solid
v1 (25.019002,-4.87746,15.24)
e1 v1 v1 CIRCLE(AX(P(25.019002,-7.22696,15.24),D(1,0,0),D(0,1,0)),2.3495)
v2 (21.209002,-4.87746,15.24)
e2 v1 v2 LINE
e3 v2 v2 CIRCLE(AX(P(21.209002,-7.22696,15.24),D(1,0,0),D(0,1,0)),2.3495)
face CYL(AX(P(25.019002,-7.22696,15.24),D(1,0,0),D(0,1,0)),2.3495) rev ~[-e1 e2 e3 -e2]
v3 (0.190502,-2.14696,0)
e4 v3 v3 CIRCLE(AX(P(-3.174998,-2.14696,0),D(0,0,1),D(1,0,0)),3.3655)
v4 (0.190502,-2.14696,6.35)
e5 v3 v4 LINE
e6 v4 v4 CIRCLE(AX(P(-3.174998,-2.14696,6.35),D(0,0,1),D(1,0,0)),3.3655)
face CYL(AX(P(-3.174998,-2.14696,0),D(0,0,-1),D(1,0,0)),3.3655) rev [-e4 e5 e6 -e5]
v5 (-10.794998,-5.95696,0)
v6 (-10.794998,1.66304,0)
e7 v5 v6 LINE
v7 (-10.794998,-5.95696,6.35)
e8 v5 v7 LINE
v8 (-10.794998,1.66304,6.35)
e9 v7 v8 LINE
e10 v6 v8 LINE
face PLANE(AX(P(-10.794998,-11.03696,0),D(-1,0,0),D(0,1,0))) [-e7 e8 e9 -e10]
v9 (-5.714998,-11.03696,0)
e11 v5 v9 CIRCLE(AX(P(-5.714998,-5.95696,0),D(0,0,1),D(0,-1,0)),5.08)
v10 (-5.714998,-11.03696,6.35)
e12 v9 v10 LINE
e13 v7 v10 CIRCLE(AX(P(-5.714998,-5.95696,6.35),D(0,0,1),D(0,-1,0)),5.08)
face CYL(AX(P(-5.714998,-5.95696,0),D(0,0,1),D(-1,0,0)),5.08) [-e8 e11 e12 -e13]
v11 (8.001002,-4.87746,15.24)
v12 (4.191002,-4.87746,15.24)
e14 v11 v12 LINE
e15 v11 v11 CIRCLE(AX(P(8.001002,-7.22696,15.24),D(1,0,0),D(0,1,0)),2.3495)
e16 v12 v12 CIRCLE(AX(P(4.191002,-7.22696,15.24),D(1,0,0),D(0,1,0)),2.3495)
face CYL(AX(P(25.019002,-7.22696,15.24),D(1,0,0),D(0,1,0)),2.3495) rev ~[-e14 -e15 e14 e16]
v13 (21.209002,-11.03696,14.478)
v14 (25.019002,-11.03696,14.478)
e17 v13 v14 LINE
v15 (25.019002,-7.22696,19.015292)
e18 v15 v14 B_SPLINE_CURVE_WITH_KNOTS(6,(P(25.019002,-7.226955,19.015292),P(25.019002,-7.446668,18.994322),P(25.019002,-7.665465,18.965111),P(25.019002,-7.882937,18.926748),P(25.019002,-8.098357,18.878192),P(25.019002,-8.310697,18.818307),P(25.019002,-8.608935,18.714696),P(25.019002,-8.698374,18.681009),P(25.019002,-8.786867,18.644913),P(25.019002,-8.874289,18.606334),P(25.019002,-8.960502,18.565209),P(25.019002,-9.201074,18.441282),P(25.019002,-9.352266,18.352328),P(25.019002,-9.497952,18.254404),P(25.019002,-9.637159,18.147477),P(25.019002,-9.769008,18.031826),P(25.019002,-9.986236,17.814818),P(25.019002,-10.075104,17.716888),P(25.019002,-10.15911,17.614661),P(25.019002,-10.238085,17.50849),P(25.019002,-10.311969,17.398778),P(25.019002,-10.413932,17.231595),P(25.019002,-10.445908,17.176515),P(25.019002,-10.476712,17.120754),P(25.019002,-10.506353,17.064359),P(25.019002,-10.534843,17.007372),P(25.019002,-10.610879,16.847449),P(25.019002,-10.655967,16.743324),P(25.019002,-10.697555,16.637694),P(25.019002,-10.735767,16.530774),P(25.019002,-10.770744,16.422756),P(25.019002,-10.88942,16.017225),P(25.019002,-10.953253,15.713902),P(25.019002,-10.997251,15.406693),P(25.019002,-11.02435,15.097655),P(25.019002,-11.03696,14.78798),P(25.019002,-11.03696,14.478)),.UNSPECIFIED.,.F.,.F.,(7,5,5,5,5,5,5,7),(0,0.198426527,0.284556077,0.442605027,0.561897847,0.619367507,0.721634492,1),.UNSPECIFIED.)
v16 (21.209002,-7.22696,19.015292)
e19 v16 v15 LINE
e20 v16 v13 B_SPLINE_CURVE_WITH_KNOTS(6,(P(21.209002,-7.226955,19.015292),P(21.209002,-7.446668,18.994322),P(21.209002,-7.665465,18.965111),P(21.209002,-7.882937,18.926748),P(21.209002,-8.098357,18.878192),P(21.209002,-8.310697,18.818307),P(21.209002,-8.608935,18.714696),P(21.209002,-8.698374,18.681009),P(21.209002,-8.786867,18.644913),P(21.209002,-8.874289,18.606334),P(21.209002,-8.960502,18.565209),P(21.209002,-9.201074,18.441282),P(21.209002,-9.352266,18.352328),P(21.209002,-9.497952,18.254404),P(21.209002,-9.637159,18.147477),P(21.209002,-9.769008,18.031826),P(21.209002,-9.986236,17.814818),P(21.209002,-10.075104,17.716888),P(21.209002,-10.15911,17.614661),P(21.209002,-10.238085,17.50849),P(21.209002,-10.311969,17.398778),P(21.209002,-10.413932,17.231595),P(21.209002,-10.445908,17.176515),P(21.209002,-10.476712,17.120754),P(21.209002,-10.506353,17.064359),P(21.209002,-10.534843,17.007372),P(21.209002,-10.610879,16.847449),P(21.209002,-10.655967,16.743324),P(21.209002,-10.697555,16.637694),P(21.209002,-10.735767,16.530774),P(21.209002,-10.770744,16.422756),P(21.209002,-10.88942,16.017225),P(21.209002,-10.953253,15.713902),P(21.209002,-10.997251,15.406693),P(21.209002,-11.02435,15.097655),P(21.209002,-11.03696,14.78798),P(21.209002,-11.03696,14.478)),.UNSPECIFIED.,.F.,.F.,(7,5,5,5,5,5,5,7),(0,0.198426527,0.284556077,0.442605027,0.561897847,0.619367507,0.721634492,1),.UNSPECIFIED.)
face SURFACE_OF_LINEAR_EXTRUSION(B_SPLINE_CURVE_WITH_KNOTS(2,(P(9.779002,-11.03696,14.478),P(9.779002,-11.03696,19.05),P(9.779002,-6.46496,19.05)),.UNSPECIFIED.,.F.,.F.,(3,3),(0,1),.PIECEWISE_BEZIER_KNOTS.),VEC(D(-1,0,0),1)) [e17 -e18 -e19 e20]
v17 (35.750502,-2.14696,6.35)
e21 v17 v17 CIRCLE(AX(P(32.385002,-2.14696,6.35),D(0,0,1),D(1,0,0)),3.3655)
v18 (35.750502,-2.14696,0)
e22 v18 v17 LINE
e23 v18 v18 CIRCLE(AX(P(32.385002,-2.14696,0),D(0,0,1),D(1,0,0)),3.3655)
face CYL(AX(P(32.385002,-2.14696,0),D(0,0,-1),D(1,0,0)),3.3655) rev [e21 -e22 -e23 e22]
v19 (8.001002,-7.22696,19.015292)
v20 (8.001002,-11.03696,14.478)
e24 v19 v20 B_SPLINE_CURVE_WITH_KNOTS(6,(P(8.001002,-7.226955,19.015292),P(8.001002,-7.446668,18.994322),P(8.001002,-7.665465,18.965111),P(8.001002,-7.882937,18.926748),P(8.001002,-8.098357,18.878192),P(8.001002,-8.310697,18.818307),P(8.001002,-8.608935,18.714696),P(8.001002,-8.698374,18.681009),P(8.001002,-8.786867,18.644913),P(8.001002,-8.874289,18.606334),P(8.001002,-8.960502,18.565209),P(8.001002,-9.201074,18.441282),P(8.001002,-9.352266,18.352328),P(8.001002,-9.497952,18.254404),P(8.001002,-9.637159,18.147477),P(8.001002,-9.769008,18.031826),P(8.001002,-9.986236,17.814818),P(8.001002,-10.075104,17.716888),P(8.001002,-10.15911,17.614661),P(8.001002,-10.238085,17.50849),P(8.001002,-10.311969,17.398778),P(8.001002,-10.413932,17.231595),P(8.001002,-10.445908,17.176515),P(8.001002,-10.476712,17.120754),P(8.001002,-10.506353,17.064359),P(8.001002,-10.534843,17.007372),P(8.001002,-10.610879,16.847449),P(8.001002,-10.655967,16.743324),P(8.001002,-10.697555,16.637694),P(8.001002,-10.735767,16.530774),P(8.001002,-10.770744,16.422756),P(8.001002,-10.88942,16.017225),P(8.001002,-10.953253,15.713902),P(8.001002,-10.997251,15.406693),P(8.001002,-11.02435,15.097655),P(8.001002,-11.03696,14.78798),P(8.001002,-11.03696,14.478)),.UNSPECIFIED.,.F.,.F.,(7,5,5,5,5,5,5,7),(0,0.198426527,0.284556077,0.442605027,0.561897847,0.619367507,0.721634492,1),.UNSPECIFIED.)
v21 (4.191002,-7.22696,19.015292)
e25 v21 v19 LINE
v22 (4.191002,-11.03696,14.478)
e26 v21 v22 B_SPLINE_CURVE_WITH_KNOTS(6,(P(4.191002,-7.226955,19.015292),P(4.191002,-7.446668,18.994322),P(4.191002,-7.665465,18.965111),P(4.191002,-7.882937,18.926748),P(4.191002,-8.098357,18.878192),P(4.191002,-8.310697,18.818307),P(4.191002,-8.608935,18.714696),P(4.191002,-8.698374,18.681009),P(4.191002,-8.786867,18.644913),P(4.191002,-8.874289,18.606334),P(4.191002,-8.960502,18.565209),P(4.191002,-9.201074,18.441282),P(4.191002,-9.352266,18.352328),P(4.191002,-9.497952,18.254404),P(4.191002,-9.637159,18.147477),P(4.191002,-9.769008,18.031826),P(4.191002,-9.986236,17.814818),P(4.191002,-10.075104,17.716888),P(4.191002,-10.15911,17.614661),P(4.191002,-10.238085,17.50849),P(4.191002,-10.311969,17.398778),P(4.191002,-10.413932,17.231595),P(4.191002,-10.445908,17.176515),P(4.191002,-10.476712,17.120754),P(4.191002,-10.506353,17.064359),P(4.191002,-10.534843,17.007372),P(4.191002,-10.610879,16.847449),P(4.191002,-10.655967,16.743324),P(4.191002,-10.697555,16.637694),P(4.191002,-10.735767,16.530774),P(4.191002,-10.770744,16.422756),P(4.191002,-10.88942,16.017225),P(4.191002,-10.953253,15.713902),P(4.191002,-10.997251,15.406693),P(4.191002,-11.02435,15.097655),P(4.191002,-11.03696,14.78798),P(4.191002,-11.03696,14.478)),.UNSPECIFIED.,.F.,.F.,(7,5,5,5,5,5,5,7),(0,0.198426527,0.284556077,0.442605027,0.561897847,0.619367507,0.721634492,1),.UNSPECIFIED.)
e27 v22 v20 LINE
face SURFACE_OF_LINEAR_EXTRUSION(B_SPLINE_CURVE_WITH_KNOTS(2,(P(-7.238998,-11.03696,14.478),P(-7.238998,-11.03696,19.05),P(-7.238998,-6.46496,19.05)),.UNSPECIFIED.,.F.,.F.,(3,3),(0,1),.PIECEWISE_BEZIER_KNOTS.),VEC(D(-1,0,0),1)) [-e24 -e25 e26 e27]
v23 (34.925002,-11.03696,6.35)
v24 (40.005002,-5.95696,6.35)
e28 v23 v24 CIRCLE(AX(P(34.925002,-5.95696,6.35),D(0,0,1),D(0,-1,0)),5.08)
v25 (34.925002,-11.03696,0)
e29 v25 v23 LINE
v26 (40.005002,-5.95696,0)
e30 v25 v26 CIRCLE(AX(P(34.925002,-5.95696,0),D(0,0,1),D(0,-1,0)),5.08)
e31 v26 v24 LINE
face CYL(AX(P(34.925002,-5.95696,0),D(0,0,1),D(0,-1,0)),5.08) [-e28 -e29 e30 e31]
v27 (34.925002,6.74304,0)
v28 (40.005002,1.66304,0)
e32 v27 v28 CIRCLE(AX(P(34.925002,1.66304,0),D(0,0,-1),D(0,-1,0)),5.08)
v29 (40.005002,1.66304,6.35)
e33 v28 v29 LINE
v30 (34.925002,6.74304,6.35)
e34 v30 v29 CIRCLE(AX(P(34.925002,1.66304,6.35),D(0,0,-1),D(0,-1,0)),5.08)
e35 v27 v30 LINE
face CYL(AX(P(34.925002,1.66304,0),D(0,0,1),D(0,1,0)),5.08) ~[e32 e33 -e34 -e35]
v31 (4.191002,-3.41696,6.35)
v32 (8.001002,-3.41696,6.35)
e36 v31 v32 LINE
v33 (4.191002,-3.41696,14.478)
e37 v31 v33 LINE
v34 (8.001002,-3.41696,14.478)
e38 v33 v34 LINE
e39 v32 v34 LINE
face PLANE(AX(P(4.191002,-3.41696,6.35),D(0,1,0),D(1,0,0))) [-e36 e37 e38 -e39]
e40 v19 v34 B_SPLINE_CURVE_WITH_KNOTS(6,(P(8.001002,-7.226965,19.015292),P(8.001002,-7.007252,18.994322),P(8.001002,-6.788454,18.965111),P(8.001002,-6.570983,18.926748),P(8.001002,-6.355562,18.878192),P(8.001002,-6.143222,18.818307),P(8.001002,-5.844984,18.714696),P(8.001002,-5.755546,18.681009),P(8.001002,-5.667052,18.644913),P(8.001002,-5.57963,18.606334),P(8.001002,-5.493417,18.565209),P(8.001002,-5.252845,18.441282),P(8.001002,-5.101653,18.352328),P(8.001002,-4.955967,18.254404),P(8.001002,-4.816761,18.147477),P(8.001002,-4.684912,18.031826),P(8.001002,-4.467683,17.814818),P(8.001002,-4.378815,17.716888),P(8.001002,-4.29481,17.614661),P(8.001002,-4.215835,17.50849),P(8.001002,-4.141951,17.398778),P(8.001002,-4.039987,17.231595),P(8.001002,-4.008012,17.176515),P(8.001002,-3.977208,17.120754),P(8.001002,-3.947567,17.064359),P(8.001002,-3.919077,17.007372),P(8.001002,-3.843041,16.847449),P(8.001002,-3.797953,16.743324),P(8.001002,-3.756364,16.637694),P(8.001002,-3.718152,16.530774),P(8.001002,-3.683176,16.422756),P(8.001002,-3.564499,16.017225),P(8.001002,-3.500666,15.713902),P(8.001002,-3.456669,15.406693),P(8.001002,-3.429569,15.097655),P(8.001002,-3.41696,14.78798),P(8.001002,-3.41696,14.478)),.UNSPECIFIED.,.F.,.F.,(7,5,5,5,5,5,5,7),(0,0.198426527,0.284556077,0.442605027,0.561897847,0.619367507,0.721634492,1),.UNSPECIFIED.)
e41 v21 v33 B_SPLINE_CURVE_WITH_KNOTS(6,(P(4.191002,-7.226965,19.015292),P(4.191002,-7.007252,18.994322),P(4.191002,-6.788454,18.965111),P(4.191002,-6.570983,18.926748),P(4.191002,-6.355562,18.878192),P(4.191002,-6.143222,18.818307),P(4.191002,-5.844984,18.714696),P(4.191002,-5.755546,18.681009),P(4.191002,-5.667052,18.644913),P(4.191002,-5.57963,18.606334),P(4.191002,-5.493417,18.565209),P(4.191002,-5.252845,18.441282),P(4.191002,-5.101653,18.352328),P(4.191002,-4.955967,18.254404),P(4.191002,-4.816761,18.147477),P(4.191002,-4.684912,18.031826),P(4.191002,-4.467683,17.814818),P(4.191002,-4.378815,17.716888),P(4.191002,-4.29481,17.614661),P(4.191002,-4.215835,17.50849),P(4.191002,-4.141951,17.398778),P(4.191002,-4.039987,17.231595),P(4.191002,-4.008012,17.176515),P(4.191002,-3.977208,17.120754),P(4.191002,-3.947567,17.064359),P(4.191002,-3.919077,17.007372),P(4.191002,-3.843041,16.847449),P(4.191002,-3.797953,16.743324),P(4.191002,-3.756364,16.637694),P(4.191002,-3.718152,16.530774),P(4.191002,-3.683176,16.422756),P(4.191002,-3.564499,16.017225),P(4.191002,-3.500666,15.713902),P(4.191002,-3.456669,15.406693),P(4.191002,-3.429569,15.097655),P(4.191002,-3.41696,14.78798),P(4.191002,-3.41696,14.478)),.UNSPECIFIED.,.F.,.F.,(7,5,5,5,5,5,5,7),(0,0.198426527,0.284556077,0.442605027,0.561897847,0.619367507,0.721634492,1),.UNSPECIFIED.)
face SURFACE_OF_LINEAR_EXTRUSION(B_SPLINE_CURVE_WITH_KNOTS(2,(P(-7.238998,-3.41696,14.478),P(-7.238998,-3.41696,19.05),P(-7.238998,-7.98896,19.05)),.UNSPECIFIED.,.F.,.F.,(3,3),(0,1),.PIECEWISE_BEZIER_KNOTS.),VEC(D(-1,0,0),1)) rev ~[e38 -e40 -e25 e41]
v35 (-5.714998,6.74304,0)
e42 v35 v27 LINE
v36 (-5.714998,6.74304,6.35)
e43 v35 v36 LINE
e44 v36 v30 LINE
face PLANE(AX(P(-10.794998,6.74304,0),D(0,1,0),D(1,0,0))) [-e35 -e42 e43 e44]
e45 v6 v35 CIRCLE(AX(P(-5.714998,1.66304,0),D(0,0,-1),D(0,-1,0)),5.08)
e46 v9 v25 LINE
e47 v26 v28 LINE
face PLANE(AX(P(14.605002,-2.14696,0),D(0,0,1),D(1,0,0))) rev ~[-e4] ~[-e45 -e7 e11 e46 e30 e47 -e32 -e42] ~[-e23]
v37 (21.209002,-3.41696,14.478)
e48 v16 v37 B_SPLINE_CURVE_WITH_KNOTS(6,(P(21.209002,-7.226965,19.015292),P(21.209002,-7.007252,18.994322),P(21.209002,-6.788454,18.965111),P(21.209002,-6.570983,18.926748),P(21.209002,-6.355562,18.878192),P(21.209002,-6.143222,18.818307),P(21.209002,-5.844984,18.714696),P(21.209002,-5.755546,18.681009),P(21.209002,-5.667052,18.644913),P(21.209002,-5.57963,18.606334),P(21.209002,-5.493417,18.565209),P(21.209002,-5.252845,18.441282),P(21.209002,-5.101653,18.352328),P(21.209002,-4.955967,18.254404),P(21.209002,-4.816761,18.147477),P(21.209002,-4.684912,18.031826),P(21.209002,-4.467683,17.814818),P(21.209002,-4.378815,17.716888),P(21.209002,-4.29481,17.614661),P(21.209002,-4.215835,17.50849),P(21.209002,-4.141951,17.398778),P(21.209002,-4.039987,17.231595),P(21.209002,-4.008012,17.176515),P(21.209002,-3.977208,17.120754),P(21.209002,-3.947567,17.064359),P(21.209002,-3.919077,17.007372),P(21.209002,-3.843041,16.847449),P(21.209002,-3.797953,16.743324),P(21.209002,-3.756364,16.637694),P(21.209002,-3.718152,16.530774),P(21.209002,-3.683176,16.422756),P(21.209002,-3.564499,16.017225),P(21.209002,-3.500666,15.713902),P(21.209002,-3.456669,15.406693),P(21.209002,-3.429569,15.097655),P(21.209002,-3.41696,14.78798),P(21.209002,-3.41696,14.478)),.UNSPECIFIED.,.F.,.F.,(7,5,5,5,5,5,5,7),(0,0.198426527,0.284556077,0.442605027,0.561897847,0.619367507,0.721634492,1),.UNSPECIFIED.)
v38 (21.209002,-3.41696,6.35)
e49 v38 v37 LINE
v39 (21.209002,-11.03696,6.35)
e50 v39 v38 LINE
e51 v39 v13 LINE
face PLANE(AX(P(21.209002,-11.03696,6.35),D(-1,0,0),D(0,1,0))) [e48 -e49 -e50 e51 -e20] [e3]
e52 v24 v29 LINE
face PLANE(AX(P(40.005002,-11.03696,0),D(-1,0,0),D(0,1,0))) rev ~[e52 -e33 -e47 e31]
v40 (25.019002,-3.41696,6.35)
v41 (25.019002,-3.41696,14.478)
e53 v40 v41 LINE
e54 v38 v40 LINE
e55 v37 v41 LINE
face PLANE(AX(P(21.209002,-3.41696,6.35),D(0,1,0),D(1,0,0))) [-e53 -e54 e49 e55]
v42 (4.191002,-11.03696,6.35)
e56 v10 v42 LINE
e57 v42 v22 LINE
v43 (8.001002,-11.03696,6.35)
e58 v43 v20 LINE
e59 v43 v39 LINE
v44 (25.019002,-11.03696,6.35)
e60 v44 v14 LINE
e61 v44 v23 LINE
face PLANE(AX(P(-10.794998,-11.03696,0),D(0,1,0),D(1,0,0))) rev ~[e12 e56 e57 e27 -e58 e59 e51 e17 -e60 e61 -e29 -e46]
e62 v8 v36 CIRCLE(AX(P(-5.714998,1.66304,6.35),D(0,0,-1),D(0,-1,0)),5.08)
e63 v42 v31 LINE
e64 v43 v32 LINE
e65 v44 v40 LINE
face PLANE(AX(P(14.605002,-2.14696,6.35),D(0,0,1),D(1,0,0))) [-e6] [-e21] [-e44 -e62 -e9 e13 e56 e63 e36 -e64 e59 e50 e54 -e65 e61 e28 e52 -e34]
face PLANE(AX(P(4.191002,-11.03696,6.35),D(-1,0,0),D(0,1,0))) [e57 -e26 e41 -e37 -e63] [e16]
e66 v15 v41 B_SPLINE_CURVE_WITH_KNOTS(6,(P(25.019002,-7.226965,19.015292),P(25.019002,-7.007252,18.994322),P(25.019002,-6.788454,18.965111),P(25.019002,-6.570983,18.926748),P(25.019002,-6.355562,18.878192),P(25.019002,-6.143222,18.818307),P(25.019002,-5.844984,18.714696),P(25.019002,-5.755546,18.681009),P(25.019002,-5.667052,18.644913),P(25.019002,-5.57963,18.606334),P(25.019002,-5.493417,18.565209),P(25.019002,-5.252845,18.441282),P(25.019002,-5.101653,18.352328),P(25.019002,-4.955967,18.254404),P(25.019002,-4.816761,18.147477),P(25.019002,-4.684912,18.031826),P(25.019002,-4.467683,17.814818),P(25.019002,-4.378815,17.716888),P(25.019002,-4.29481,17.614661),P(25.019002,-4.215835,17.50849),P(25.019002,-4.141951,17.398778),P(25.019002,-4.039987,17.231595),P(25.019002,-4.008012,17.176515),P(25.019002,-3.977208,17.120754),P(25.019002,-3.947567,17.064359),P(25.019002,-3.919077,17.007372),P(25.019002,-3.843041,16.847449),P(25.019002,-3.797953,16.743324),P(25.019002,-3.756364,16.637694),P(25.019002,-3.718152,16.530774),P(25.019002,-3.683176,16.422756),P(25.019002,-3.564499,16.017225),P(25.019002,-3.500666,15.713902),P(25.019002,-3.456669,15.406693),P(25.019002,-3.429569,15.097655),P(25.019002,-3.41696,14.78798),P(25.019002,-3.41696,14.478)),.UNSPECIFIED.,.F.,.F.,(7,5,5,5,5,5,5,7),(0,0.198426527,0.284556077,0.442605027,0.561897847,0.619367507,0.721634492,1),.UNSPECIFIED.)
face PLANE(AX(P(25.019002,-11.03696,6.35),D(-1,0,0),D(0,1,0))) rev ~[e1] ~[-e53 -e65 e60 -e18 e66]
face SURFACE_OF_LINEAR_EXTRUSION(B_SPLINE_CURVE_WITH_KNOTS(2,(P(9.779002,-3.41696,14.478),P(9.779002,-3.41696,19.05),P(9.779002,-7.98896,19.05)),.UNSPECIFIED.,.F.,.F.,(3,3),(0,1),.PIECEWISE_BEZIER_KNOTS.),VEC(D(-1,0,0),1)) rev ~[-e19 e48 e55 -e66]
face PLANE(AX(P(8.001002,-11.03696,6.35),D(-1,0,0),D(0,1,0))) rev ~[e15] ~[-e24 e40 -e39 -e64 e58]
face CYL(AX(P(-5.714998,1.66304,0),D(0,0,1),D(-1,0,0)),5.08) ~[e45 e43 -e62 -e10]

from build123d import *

# Parameters (mm, degrees)
F0_W        = 50.8
F0_H        = 17.78
F0_R        = 3.3655
F1_DEPTH    = 6.35
F2_R        = 5.08
F3_W        = 3.81
F3_H        = 7.62
F4_DEPTH    = 12.7
F5_R        = 2.3495
F6_DEPTH    = 25.4
F7_T1_DEPTH = 26.67
F7_T3_DEPTH = 26.67


# Not quite as in the source:
# - a fillet or chamfer that OpenCascade refuses, or shapes differently, is made with other operations: its cross-section is extruded or revolved along the edge and cut away or added


with BuildPart() as f1:
    # F0 (on Top) → F1 (new body)
    with BuildSketch(Plane.XY):
        with Locations((14.6050021708, -2.1469597467)):
            Rectangle(F0_W, F0_H)
        with Locations((-3.1749978292, -2.1469597467)):
            Circle(F0_R, mode=Mode.SUBTRACT)
        with Locations((32.3850021708, -2.1469597467)):
            Circle(F0_R, mode=Mode.SUBTRACT)
    extrude(amount=F1_DEPTH)

    # F2
    f2_edges = [f1.edges().sort_by_distance(p)[0] for p in [
        (40.005002, -11.03696, 3.175),
        (40.005002, 6.74304, 3.175),
        (-10.794998, -11.03696, 3.175),
        (-10.794998, 6.74304, 3.175),
    ]]
    fillet(f2_edges, radius=F2_R)

    # F3 (on face) → F4 (join)
    with BuildSketch(Plane.XY.offset(6.35)):
        with Locations((6.0960021708, -7.2269597467)):
            Rectangle(F3_W, F3_H)
        with Locations((23.1140021708, -7.2269597467)):
            Rectangle(F3_W, F3_H)
    extrude(amount=F4_DEPTH)

    # F5 (on face) → F6 (cut)
    with BuildSketch(Plane.YZ.offset(25.0190021708)):
        with Locations((-7.2269597467, 15.24)):
            Circle(F5_R)
    extrude(amount=-F6_DEPTH, mode=Mode.SUBTRACT)

    # F7: fillet of radius 4.572 on 4 edges, made by hand

    # F7_s2 → F7_t1 (cut)
    with BuildSketch(Plane.YZ.offset(-7.2389978292)):
        with BuildLine():
            add(Edge.make_bspline(
                [(-11.0369597467, 14.478), (-11.0369597467, 19.05), (-6.4649597467, 19.05)],
                knots=[0, 0, 0, 1, 1, 1], degree=2, weights=[1, 1, 1]))
            Line((-6.4649597467, 19.05), (-11.0369597467, 19.05))
            Line((-11.0369597467, 19.05), (-11.0369597467, 14.478))
        make_face()
        with BuildLine():
            add(Edge.make_bspline(
                [(-3.4169597467, 14.478), (-3.4169597467, 19.05), (-7.9889597467, 19.05)],
                knots=[0, 0, 0, 1, 1, 1], degree=2, weights=[1, 1, 1]))
            Line((-7.9889597467, 19.05), (-3.4169597467, 19.05))
            Line((-3.4169597467, 19.05), (-3.4169597467, 14.478))
        make_face()
    extrude(amount=F7_T1_DEPTH, mode=Mode.SUBTRACT)

    # F7_s4 → F7_t3 (cut)
    with BuildSketch(Plane.YZ.offset(9.7790021708)):
        with BuildLine():
            add(Edge.make_bspline(
                [(-11.0369597467, 14.478), (-11.0369597467, 19.05), (-6.4649597467, 19.05)],
                knots=[0, 0, 0, 1, 1, 1], degree=2, weights=[1, 1, 1]))
            Line((-6.4649597467, 19.05), (-11.0369597467, 19.05))
            Line((-11.0369597467, 19.05), (-11.0369597467, 14.478))
        make_face()
        with BuildLine():
            add(Edge.make_bspline(
                [(-3.4169597467, 14.478), (-3.4169597467, 19.05), (-7.9889597467, 19.05)],
                knots=[0, 0, 0, 1, 1, 1], degree=2, weights=[1, 1, 1]))
            Line((-7.9889597467, 19.05), (-3.4169597467, 19.05))
            Line((-3.4169597467, 19.05), (-3.4169597467, 14.478))
        make_face()
    extrude(amount=F7_T3_DEPTH, mode=Mode.SUBTRACT)


solid = f1.part
